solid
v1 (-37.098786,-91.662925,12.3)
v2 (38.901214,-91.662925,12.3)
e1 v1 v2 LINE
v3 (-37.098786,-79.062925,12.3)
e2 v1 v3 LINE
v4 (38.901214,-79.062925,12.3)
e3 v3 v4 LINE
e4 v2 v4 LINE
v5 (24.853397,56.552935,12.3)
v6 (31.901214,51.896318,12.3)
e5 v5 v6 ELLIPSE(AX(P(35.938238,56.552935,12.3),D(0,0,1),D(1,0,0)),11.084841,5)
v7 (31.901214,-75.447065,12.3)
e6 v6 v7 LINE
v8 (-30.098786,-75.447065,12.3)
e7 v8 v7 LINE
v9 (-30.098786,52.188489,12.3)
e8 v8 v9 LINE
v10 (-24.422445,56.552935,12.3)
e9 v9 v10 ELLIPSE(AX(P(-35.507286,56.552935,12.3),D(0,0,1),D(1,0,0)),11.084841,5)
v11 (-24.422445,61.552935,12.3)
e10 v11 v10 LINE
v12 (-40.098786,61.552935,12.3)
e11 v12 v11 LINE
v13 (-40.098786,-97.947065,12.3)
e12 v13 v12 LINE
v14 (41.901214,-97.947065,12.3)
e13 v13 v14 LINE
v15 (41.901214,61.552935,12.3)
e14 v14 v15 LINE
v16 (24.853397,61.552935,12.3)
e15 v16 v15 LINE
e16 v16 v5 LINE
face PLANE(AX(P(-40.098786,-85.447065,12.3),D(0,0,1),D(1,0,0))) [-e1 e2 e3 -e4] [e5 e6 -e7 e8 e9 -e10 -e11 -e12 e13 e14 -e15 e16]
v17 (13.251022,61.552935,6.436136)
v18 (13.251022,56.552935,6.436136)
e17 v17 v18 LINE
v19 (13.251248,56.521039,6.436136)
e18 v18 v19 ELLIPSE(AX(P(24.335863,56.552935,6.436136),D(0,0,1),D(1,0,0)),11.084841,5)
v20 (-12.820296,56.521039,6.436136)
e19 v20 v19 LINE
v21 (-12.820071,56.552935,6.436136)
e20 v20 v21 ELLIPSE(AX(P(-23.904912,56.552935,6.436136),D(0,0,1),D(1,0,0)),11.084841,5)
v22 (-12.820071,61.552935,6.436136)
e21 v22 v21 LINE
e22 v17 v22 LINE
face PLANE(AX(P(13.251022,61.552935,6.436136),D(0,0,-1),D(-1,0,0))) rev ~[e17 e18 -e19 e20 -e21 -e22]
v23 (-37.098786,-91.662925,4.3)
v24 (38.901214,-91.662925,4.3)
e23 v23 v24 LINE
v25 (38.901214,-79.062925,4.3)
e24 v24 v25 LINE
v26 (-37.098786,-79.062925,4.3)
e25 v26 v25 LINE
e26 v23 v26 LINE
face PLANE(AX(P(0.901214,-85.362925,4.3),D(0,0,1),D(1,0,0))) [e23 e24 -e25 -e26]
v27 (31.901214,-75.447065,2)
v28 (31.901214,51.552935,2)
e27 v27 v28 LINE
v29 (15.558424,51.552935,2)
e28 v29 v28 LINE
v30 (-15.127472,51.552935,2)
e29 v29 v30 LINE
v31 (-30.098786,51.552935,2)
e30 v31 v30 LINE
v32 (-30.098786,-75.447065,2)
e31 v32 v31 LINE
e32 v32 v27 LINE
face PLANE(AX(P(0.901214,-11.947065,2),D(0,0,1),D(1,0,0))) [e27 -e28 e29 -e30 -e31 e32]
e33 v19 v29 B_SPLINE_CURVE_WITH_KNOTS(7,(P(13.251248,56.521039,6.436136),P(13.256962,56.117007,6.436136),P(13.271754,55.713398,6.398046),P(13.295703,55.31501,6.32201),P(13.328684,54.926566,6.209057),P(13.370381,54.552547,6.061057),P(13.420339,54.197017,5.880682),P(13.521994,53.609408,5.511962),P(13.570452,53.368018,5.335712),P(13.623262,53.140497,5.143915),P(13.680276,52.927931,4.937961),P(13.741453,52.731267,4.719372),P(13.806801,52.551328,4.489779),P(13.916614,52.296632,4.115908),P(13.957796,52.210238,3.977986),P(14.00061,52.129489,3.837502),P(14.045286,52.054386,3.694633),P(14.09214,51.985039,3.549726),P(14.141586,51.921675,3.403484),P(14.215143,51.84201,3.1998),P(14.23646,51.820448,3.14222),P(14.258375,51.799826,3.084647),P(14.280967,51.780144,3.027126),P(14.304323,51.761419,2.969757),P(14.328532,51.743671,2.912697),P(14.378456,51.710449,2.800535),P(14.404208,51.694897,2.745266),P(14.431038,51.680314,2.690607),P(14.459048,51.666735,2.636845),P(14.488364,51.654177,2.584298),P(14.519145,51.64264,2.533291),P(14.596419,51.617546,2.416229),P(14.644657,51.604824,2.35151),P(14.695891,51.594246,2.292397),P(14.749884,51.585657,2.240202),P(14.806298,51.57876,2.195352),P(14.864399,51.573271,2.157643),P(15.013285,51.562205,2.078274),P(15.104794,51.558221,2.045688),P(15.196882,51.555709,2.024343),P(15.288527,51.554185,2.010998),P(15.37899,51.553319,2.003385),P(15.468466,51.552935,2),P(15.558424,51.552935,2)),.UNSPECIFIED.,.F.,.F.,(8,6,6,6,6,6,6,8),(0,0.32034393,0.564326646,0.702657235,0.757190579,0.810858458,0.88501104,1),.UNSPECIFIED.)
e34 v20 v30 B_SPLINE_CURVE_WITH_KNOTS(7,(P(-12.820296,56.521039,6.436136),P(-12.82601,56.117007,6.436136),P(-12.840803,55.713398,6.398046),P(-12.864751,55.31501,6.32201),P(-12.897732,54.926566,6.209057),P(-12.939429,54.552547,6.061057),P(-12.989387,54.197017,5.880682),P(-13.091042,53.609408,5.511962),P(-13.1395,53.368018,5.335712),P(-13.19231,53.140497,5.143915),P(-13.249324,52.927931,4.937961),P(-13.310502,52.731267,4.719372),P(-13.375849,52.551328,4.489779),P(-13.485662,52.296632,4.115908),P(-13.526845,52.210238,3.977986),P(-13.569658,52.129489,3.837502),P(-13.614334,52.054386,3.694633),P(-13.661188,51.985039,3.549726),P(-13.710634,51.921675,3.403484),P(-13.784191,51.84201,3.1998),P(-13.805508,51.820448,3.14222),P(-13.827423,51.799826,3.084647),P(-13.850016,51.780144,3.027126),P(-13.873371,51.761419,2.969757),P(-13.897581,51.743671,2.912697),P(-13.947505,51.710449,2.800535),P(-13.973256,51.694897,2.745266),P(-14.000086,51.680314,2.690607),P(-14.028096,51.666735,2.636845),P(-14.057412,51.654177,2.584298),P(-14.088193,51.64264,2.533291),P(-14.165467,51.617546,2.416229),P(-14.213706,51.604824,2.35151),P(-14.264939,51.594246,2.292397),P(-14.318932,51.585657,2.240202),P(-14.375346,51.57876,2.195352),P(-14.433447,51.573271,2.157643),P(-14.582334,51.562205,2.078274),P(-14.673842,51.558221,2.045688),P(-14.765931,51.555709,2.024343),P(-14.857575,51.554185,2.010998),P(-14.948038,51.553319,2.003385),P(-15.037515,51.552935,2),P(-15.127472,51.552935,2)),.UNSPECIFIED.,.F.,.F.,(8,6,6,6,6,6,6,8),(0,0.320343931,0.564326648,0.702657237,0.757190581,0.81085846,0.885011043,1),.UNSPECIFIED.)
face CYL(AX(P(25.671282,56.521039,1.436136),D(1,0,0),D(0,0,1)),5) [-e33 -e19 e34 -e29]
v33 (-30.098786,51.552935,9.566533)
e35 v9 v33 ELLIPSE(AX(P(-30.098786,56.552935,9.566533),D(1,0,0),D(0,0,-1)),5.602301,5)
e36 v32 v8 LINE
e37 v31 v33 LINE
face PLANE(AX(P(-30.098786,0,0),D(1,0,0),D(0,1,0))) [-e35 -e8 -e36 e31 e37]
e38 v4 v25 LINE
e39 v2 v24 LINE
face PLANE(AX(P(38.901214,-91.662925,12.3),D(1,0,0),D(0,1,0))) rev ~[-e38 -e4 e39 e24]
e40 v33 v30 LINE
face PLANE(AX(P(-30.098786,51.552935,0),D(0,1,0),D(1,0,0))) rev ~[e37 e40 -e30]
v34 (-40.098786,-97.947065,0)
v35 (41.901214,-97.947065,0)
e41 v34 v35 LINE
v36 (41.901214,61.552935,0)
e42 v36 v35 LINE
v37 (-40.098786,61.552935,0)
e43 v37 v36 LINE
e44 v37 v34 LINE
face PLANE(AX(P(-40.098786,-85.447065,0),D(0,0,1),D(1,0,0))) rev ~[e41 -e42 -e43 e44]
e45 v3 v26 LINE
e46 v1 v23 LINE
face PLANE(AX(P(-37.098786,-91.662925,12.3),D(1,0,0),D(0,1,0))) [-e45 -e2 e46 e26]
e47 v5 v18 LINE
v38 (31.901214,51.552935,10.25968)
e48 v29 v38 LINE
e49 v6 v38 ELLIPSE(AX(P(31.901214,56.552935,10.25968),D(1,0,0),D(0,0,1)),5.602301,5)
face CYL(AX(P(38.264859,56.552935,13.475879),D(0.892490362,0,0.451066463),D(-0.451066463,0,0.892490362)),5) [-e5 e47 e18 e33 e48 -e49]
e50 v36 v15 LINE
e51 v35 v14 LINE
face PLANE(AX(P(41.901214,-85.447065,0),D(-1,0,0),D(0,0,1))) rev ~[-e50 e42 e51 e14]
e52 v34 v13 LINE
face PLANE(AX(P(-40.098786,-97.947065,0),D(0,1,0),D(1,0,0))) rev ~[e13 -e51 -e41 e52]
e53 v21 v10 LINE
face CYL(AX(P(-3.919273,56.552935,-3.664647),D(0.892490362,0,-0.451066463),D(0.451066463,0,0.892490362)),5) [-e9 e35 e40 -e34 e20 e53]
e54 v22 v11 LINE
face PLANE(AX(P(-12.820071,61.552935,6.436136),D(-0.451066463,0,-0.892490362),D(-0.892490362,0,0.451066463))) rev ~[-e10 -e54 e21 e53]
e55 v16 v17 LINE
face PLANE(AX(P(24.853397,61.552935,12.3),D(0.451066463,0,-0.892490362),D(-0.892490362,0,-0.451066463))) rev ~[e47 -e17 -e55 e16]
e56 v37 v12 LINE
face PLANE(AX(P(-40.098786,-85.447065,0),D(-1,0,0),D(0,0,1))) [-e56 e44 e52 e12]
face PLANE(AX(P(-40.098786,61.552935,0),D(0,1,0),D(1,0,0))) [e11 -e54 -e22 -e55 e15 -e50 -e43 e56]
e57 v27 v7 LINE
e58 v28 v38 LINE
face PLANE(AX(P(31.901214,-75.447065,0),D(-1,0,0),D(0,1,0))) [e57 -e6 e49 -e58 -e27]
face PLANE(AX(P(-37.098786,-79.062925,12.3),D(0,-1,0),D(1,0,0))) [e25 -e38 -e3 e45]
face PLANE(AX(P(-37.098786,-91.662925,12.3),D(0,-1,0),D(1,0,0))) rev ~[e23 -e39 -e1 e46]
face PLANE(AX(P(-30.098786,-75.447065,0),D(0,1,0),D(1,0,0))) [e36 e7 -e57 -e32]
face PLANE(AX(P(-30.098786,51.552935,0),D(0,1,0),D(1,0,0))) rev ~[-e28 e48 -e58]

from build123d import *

# Parameters (mm, degrees)
F0_W         = 82
F0_H         = 147
F0_W_2       = 62
F0_H_2       = 127
F1_DEPTH     = 12.3
F2_DEPTH     = 2
F4_DEPTH     = 12.5
F5_W         = 76
F5_H         = 12.6
F6_DEPTH     = 8
F7_DEPTH     = 25
F8_T4_DEPTH  = 38
F8_T10_DEPTH = 50.9116130734
F8_T16_DEPTH = 38
F8_T23_DEPTH = 38
F8_T28_DEPTH = 50.9116130734
F8_T35_DEPTH = 50.9116130734
F8_T39_DEPTH = 38


# Not quite as in the source:
# - a fillet or chamfer that OpenCascade refuses, or shapes differently, is made with other operations: its cross-section is extruded or revolved along the edge and cut away or added


with BuildPart() as f1:
    # F0 (on Top) → F1 (new body)
    with BuildSketch(Plane.XY):
        with Locations((0.9012136459, -11.9470648118)):
            Rectangle(F0_W, F0_H)
        with Locations((0.9012136459, -11.9470648118)):
            Rectangle(F0_W_2, F0_H_2, mode=Mode.SUBTRACT)
    extrude(amount=F1_DEPTH)

    # F0 (on Top) → F2 (join)
    with BuildSketch(Plane.XY):
        with Locations((0.9012136459, -11.9470648118)):
            Rectangle(F0_W_2, F0_H_2)
    extrude(amount=F2_DEPTH)

    # F4 (add): a face of the model
    f4_faces = [f1.faces().sort_by_distance(p)[0] for p in [
        (0.9012136459, -85.4470648118, 6.15),
    ]]
    extrude(f4_faces, amount=F4_DEPTH)

    # F5 (on face) → F6 (cut)
    with BuildSketch(Plane.XY.offset(12.3)):
        with Locations((0.9012136459, -85.3629247222)):
            Rectangle(F5_W, F5_H)
    extrude(amount=-F6_DEPTH, mode=Mode.SUBTRACT)

    # F3 (on face) → F7 (cut)
    with BuildSketch(Plane(origin=(0, 61.5529351882, 0), x_dir=(-1, 0, 0), z_dir=(0, 1, 0))):
        Polygon((24.4224453152, 12.3), (-24.8533971608, 12.3), (-13.251022455, 6.4361359849), (12.8200706095, 6.4361359849), align=None)
    extrude(amount=-F7_DEPTH, mode=Mode.SUBTRACT)

    # F8: fillet of radius 5 on 3 edges, made by hand


with BuildPart() as f8_tool2:
    # F8_s3 → F8_t4 (new body)
    with BuildSketch(Plane(origin=(-1.6465684555, 0, 0.8321790805), x_dir=(0, 1, 0), z_dir=(-0.892490362, 0, 0.4510664627))):
        with BuildLine():
            ThreePointArc((56.5529351882, 0.0385145664), (53.0174012823, 1.5029806605), (51.5529351882, 5.0385145664))
            Line((51.5529351882, 5.0385145664), (51.5529351882, 0.0385145664))
            Line((51.5529351882, 0.0385145664), (56.5529351882, 0.0385145664))
        make_face()
    extrude(amount=F8_T4_DEPTH)

    split(bisect_by=Plane.XY.offset(6.4361359849), keep=Keep.TOP)

    split(bisect_by=Plane.YZ.offset(-30.0987863541), keep=Keep.TOP)


with BuildPart() as f1_1:
    add(f1.part)

    # F8_t1: cut F8_tool2
    add(f8_tool2.part, mode=Mode.SUBTRACT)


with BuildPart() as f8_tool8:
    # F8_s9 → F8_t10 (new body)
    with BuildSketch(Plane.YZ.offset(25.6712824595)):
        with BuildLine():
            ThreePointArc((56.52103919, 6.4361359849), (53.1908229865, 5.1657016483), (51.5529351882, 2))
            Line((51.5529351882, 2), (51.5529351882, 6.4361359849))
            Line((51.5529351882, 6.4361359849), (56.52103919, 6.4361359849))
        make_face()
    extrude(amount=-F8_T10_DEPTH)

    split(bisect_by=Plane(origin=(-0.0173726292, 0, -0.0343738793), x_dir=(0, 1, 0), z_dir=(0.4510664627, 0, 0.892490362)), keep=Keep.TOP)

    split(bisect_by=Plane(origin=(0.1050545028, 0, -0.2078632285), x_dir=(0, 1, 0), z_dir=(-0.4510664627, 0, 0.892490362)), keep=Keep.TOP)


with BuildPart() as f1_2:
    add(f1_1.part)

    # F8_t7: cut F8_tool8
    add(f8_tool8.part, mode=Mode.SUBTRACT)


with BuildPart() as f8_tool14:
    # F8_s15 → F8_t16 (new body)
    with BuildSketch(Plane(origin=(35.9044721827, 0, 18.1461940123), x_dir=(0, 1, 0), z_dir=(-0.892490362, 0, -0.4510664627))):
        with BuildLine():
            ThreePointArc((56.5529351882, 0.232902491), (53.0174012823, 1.6973685851), (51.5529351882, 5.232902491))
            Line((51.5529351882, 5.232902491), (51.5529351882, 0.232902491))
            Line((51.5529351882, 0.232902491), (56.5529351882, 0.232902491))
        make_face()
    extrude(amount=F8_T16_DEPTH)

    split(bisect_by=Plane.XY.offset(6.4361359849), keep=Keep.TOP)

    split(bisect_by=Plane.YZ.offset(31.9012136459), keep=Keep.BOTTOM)


with BuildPart() as f1_3:
    add(f1_2.part)

    # F8_t13: cut F8_tool14
    add(f8_tool14.part, mode=Mode.SUBTRACT)


with BuildPart() as f8_tool21:
    # F8_s22 → F8_t23 (new body)
    with BuildSketch(Plane(origin=(-1.6465684555, 0, 0.8321790805), x_dir=(0, 1, 0), z_dir=(-0.892490362, 0, 0.4510664627))):
        with BuildLine():
            ThreePointArc((56.5529351882, 0.0385145664), (53.0174012823, 1.5029806605), (51.5529351882, 5.0385145664))
            Line((51.5529351882, 5.0385145664), (51.5529351882, 0.0385145664))
            Line((51.5529351882, 0.0385145664), (56.5529351882, 0.0385145664))
        make_face()
    extrude(amount=F8_T23_DEPTH)

    split(bisect_by=Plane.XY.offset(6.4361359849), keep=Keep.BOTTOM)

    split(bisect_by=Plane.XY.offset(2), keep=Keep.TOP)


with BuildPart() as f8_tool26:
    # F8_s27 → F8_t28 (new body)
    with BuildSketch(Plane.YZ.offset(25.6712824595)):
        with BuildLine():
            ThreePointArc((56.52103919, 6.4361359849), (53.1908229865, 5.1657016483), (51.5529351882, 2))
            Line((51.5529351882, 2), (51.5529351882, 6.4361359849))
            Line((51.5529351882, 6.4361359849), (56.52103919, 6.4361359849))
        make_face()
    extrude(amount=-F8_T28_DEPTH)

    split(bisect_by=Plane(origin=(-0.0173726292, 0, -0.0343738793), x_dir=(0, 1, 0), z_dir=(-0.4510664627, 0, -0.892490362)), keep=Keep.TOP)


with BuildPart() as f8_tool21_1:
    add(f8_tool21.part)

    # F8_t30: intersect F8_tool26
    add(f8_tool26.part, mode=Mode.INTERSECT)


with BuildPart() as f1_4:
    add(f1_3.part)

    # F8_t19: cut F8_tool21
    add(f8_tool21_1.part, mode=Mode.SUBTRACT)


with BuildPart() as f8_tool33:
    # F8_s34 → F8_t35 (new body)
    with BuildSketch(Plane.YZ.offset(25.6712824595)):
        with BuildLine():
            ThreePointArc((56.52103919, 6.4361359849), (53.1908229865, 5.1657016483), (51.5529351882, 2))
            Line((51.5529351882, 2), (51.5529351882, 6.4361359849))
            Line((51.5529351882, 6.4361359849), (56.52103919, 6.4361359849))
        make_face()
    extrude(amount=-F8_T35_DEPTH)

    split(bisect_by=Plane(origin=(0.1050545028, 0, -0.2078632285), x_dir=(0, 1, 0), z_dir=(0.4510664627, 0, -0.892490362)), keep=Keep.TOP)


with BuildPart() as f8_tool37:
    # F8_s38 → F8_t39 (new body)
    with BuildSketch(Plane(origin=(35.9044721827, 0, 18.1461940123), x_dir=(0, 1, 0), z_dir=(-0.892490362, 0, -0.4510664627))):
        with BuildLine():
            ThreePointArc((56.5529351882, 0.232902491), (53.0174012823, 1.6973685851), (51.5529351882, 5.232902491))
            Line((51.5529351882, 5.232902491), (51.5529351882, 0.232902491))
            Line((51.5529351882, 0.232902491), (56.5529351882, 0.232902491))
        make_face()
    extrude(amount=F8_T39_DEPTH)

    split(bisect_by=Plane.XY.offset(6.4361359849), keep=Keep.BOTTOM)

    split(bisect_by=Plane.XY.offset(2), keep=Keep.TOP)


with BuildPart() as f8_tool33_1:
    add(f8_tool33.part)

    # F8_t42: intersect F8_tool37
    add(f8_tool37.part, mode=Mode.INTERSECT)


with BuildPart() as f1_5:
    add(f1_4.part)

    # F8_t31: cut F8_tool33
    add(f8_tool33_1.part, mode=Mode.SUBTRACT)


solid = f1_5.part
